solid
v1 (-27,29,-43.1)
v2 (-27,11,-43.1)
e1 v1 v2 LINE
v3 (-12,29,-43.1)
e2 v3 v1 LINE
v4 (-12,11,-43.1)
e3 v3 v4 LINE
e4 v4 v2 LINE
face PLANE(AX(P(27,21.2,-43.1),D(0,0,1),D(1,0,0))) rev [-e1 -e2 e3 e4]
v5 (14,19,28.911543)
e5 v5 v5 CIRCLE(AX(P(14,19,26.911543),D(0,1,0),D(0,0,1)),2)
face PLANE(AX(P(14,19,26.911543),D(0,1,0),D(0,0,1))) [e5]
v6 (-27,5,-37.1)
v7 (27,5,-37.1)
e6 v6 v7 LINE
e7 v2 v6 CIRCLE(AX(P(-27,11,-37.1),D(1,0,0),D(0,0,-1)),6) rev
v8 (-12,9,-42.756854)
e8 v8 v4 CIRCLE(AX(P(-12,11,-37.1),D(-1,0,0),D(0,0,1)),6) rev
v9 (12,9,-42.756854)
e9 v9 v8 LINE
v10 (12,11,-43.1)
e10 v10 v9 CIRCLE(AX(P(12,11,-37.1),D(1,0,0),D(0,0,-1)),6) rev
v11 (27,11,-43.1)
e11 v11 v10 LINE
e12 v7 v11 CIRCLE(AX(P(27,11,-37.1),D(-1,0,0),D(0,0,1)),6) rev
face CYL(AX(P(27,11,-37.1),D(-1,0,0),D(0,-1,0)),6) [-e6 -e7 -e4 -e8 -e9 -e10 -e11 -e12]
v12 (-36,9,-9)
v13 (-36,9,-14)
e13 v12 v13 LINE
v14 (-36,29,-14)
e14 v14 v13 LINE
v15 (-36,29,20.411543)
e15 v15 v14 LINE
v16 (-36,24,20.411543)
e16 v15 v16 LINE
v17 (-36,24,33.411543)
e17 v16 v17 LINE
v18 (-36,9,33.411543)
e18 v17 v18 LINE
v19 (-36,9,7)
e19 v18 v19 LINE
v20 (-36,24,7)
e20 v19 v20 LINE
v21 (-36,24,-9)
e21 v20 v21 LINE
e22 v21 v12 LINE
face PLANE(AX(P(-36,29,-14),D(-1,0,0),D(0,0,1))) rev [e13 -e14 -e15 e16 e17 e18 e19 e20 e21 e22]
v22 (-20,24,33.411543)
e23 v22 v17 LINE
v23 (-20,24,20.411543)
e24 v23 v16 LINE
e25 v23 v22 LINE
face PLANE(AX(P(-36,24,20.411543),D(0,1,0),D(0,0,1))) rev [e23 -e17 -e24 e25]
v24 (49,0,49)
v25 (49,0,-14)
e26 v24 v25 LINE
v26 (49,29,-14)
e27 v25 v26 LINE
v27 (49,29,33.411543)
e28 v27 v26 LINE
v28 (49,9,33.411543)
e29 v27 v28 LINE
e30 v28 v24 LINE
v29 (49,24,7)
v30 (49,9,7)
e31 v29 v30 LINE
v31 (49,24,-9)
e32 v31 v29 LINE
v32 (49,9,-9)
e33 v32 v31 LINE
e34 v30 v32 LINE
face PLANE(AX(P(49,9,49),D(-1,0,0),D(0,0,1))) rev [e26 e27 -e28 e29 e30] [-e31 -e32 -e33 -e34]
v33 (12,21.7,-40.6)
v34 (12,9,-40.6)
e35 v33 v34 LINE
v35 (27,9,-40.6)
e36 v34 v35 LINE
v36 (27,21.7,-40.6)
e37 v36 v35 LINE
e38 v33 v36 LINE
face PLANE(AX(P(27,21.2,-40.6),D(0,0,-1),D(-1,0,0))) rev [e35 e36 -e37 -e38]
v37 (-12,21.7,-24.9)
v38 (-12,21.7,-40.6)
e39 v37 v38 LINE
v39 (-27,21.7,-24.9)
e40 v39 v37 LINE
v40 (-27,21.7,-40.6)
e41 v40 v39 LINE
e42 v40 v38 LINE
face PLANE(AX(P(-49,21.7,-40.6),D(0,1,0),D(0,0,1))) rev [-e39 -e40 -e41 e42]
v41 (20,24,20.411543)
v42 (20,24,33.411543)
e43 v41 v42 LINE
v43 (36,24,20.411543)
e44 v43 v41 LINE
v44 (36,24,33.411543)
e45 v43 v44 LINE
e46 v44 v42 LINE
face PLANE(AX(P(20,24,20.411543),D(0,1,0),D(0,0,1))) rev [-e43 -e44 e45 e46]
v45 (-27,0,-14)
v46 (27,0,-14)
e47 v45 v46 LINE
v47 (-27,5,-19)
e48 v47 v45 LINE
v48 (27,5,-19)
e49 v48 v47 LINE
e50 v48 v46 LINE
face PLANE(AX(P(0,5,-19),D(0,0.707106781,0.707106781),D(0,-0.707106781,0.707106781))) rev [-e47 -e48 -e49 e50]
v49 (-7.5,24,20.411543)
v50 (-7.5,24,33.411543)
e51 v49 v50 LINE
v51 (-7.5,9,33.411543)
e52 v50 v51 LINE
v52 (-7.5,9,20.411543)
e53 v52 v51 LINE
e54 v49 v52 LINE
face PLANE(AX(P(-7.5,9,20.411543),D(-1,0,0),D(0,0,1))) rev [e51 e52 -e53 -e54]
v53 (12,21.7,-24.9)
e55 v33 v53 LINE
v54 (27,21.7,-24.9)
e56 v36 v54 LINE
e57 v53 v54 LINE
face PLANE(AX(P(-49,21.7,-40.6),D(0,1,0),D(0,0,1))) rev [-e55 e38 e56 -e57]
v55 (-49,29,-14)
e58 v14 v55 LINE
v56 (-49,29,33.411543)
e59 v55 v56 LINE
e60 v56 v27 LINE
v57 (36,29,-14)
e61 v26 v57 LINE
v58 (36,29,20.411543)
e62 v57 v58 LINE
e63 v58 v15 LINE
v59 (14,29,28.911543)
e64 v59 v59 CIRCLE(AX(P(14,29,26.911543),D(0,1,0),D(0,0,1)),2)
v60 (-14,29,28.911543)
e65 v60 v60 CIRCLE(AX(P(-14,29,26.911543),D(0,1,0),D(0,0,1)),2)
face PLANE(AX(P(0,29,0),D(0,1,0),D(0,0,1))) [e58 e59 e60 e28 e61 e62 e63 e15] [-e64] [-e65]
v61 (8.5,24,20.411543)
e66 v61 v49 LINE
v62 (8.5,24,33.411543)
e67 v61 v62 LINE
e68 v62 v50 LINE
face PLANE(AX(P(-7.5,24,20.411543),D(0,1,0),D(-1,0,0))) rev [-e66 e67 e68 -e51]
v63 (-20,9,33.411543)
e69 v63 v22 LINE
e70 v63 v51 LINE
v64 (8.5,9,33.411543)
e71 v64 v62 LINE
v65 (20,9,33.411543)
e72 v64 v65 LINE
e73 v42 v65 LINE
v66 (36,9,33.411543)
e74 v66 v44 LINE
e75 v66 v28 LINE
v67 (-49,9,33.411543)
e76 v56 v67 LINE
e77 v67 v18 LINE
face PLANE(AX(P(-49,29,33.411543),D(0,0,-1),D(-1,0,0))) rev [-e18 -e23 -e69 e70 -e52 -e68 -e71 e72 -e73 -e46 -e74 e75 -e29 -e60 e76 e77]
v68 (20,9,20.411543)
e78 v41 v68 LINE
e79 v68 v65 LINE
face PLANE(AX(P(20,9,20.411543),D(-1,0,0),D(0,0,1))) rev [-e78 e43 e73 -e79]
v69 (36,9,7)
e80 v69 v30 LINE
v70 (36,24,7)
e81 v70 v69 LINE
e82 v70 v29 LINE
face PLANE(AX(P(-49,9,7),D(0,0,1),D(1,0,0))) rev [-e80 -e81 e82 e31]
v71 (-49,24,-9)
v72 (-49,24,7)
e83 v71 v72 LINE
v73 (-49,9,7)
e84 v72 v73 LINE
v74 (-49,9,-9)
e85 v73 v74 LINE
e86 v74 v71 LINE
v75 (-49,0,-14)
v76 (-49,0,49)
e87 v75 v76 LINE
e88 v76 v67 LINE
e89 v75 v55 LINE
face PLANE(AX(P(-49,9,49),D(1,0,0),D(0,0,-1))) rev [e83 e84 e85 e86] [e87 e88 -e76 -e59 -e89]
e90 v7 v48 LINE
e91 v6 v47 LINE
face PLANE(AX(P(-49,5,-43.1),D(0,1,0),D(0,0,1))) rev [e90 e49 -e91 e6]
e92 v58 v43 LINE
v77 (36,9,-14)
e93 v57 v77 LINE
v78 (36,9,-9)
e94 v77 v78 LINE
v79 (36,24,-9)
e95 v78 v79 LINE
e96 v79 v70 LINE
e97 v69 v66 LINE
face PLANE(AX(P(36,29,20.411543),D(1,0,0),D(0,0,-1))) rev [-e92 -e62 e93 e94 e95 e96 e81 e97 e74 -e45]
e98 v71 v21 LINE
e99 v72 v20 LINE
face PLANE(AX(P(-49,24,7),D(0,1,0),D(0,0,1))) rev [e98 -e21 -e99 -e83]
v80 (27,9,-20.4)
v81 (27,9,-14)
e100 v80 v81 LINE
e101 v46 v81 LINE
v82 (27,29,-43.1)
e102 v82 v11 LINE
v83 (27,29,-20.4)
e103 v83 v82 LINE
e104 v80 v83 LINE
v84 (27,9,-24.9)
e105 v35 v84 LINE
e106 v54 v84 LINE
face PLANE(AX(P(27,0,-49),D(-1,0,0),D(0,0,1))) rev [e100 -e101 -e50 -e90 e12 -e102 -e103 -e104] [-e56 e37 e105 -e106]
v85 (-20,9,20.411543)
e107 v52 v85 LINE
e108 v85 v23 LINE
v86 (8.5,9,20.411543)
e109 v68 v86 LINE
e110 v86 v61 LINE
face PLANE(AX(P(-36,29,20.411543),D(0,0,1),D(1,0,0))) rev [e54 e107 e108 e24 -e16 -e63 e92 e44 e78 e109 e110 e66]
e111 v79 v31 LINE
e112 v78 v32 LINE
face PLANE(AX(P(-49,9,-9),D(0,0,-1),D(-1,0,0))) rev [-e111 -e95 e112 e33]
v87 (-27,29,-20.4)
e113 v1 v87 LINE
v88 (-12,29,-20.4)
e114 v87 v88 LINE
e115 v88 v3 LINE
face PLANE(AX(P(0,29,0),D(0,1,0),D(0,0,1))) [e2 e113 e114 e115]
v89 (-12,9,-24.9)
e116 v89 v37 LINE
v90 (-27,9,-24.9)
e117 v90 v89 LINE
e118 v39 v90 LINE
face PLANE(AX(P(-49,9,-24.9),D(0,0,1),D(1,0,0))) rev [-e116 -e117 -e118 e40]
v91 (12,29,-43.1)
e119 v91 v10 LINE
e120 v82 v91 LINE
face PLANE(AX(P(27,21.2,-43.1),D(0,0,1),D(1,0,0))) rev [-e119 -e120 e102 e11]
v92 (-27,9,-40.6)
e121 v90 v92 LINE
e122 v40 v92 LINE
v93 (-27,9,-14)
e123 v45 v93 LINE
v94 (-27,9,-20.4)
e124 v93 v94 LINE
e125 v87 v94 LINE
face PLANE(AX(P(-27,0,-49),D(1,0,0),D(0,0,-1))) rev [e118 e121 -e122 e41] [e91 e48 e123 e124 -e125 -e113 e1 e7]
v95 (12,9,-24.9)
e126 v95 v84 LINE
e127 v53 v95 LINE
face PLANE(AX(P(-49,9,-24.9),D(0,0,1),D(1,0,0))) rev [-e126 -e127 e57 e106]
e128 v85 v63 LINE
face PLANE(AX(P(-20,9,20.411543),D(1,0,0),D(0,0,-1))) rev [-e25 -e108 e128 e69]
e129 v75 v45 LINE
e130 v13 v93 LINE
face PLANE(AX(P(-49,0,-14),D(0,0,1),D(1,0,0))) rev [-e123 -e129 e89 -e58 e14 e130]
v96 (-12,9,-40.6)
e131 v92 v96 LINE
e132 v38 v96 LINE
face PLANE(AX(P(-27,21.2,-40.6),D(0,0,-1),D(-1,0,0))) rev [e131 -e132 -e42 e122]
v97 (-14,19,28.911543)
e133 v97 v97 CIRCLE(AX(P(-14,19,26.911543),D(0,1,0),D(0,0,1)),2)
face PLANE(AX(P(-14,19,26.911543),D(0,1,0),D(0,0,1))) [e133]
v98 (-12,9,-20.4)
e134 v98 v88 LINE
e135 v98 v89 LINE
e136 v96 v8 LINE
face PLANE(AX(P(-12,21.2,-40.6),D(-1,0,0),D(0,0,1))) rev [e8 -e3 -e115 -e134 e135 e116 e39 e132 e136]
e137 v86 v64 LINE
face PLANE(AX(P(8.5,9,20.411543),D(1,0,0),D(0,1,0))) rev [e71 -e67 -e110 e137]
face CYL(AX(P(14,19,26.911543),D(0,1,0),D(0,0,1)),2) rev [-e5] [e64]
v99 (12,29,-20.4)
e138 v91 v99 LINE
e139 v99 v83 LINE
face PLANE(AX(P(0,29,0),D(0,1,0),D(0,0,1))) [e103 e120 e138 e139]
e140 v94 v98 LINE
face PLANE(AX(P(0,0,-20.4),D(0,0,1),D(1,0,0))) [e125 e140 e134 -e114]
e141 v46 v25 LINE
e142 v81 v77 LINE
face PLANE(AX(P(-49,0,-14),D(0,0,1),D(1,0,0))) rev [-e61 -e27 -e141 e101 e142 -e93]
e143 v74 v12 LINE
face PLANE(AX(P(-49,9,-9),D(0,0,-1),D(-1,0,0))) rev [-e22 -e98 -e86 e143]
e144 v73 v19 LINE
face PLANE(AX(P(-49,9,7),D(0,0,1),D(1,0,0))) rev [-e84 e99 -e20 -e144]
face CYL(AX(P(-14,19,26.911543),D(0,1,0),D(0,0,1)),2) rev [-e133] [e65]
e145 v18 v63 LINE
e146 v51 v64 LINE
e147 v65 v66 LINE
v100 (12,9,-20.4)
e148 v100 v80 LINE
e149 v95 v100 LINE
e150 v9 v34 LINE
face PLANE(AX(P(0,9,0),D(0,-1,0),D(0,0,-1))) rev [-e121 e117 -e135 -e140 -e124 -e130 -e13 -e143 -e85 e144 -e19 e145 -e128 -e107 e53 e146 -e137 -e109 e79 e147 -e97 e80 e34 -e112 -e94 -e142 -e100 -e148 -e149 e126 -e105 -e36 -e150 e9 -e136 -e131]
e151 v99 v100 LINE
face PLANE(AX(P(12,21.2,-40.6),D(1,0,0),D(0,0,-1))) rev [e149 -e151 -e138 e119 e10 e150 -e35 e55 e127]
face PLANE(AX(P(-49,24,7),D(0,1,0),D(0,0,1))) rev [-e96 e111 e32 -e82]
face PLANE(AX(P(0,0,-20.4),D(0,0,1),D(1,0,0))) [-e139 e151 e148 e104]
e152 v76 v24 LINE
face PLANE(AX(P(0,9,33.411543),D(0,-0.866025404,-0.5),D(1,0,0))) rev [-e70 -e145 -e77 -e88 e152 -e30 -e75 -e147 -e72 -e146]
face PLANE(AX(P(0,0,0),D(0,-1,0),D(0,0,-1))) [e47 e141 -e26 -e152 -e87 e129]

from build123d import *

# Parameters (mm, degrees)
CROQUIS1_W              = 98
CROQUIS1_H              = 98
SALIENTE_EXTRUIR1_DEPTH = 9
CHAFL_N1_SIZE2          = 15.588457268
CHAFL_N1_SIZE           = 9
CROQUIS2_W              = 22
CROQUIS2_H              = 35
CORTAR_EXTRUIR1_DEPTH   = 9
CROQUIS3_W              = 15
CROQUIS3_H              = 2.5
SALIENTE_EXTRUIR2_DEPTH = 12.2
CROQUIS4_W              = 15
CROQUIS4_H              = 20.2
SALIENTE_EXTRUIR3_DEPTH = 2.5
CROQUIS5_W              = 5.9
CROQUIS5_H              = 9
CORTAR_EXTRUIR2_DEPTH   = 54.2
CROQUIS6_W              = 15
CROQUIS6_H              = 14.7
SALIENTE_EXTRUIR4_DEPTH = 2.5
SALIENTE_EXTRUIR5_DEPTH = 20
CROQUIS8_W              = 16
CROQUIS8_H              = 15
CORTAR_EXTRUIR3_DEPTH   = 98
CROQUIS9_W              = 16
CROQUIS9_H              = 15
CORTAR_EXTRUIR4_DEPTH   = 13
CROQUIS10_W             = 15
CROQUIS10_H             = 22.7
SALIENTE_EXTRUIR6_DEPTH = 5.3
CROQUIS11_R             = 2
CORTAR_EXTRUIR5_DEPTH   = 10
CROQUIS12_W             = 29.1
CROQUIS12_H             = 5
CORTAR_EXTRUIR6_DEPTH   = 95.963150748
NERVIO1_REACH           = 77.12
CROQUIS13_WALL_W        = 159.310876118
CROQUIS13_WALL_H        = 54
REDONDEO1_R             = 6
CROQUIS14_W             = 15.7
CROQUIS14_H             = 12.7
CORTAR_EXTRUIR7_DEPTH   = 95.963150748


# Some blends are built 0.0001 mm under size
with BuildPart() as part:
    # Croquis1 → Saliente-Extruir1 (new body)
    with BuildSketch(Plane(origin=(0, 0, 0), x_dir=(1, 0, 0), z_dir=(0, 1, 0))):
        Rectangle(CROQUIS1_W, CROQUIS1_H)
    extrude(amount=SALIENTE_EXTRUIR1_DEPTH)

    # Chaflán1
    chafl_n1_edges = [part.edges().sort_by_distance(p)[0] for p in [
        (0, 9, 49),
    ]]
    chafl_n1_side = [part.faces().sort_by_distance(p)[0] for p in [
        (0, 8.82, 49),
    ]]
    chamfer(chafl_n1_edges, length=CHAFL_N1_SIZE - 0.0001, length2=CHAFL_N1_SIZE2 - 0.0001, reference=chafl_n1_side[0])  # a hair under: the kernel refuses the full size

    # Croquis2 → Cortar-Extruir1 (cut)
    with BuildSketch(Plane(origin=(0, 9, 0), x_dir=(1, 0, 0), z_dir=(0, 1, 0))):
        with Locations((-38, 31.5)):
            Rectangle(CROQUIS2_W, CROQUIS2_H)
        with Locations((38, 31.5)):
            Rectangle(CROQUIS2_W, CROQUIS2_H)
    extrude(amount=-CORTAR_EXTRUIR1_DEPTH, mode=Mode.SUBTRACT)

    # Croquis3 → Saliente-Extruir2 (add)
    with BuildSketch(Plane(origin=(0, 9, 0), x_dir=(1, 0, 0), z_dir=(0, 1, 0))):
        with Locations((19.5, 41.85)):
            Rectangle(CROQUIS3_W, CROQUIS3_H)
        with Locations((19.5, 24.15)):
            Rectangle(CROQUIS3_W, CROQUIS3_H)
        with Locations((-19.5, 41.85)):
            Rectangle(CROQUIS3_W, CROQUIS3_H)
        with Locations((-19.5, 24.15)):
            Rectangle(CROQUIS3_W, CROQUIS3_H)
    extrude(amount=SALIENTE_EXTRUIR2_DEPTH)

    # Croquis4 → Saliente-Extruir3 (add)
    with BuildSketch(Plane(origin=(0, 21.2, 0), x_dir=(1, 0, 0), z_dir=(0, 1, 0))):
        with Locations((-19.5, 33)):
            Rectangle(CROQUIS4_W, CROQUIS4_H)
        with Locations((19.5, 33)):
            Rectangle(CROQUIS4_W, CROQUIS4_H)
    extrude(amount=SALIENTE_EXTRUIR3_DEPTH)

    # Croquis5 → Cortar-Extruir2 (cut)
    with BuildSketch(Plane(origin=(27, 0, 0), x_dir=(0, 0, -1), z_dir=(1, 0, 0))):
        with Locations((46.05, 4.5)):
            Rectangle(CROQUIS5_W, CROQUIS5_H)
    extrude(amount=-CORTAR_EXTRUIR2_DEPTH, mode=Mode.SUBTRACT)

    # Croquis6 → Saliente-Extruir4 (add)
    with BuildSketch(Plane.XY.offset(-22.9)):
        with Locations((-19.5, 16.35)):
            Rectangle(CROQUIS6_W, CROQUIS6_H)
        with Locations((19.5, 16.35)):
            Rectangle(CROQUIS6_W, CROQUIS6_H)
    extrude(amount=SALIENTE_EXTRUIR4_DEPTH)

    # Croquis7 → Saliente-Extruir5 (add)
    with BuildSketch(Plane(origin=(0, 9, 0), x_dir=(1, 0, 0), z_dir=(0, 1, 0))):
        Polygon((-49, 14), (-49, -33.411542732), (49, -33.411542732), (49, 14), (36, 14), (36, -20.411542732), (-36, -20.411542732), (-36, 14), align=None)
    extrude(amount=SALIENTE_EXTRUIR5_DEPTH)

    # Croquis8 → Cortar-Extruir3 (cut)
    with BuildSketch(Plane(origin=(49, 0, 0), x_dir=(0, 0, -1), z_dir=(1, 0, 0))):
        with Locations((1, 16.5)):
            Rectangle(CROQUIS8_W, CROQUIS8_H)
    extrude(amount=-CORTAR_EXTRUIR3_DEPTH, mode=Mode.SUBTRACT)

    # Croquis9 → Cortar-Extruir4 (cut)
    with BuildSketch(Plane.XY.offset(33.411542732)):
        with Locations((-28, 16.5)):
            Rectangle(CROQUIS9_W, CROQUIS9_H)
        with Locations((0.5, 16.5)):
            Rectangle(CROQUIS9_W, CROQUIS9_H)
        with Locations((28, 16.5)):
            Rectangle(CROQUIS9_W, CROQUIS9_H)
    extrude(amount=-CORTAR_EXTRUIR4_DEPTH, mode=Mode.SUBTRACT)

    # Croquis10 → Saliente-Extruir6 (add)
    with BuildSketch(Plane(origin=(0, 23.7, 0), x_dir=(1, 0, 0), z_dir=(0, 1, 0))):
        with Locations((-19.5, 31.75)):
            Rectangle(CROQUIS10_W, CROQUIS10_H)
        with Locations((19.5, 31.75)):
            Rectangle(CROQUIS10_W, CROQUIS10_H)
    extrude(amount=SALIENTE_EXTRUIR6_DEPTH)

    # Croquis11 → Cortar-Extruir5 (cut)
    with BuildSketch(Plane(origin=(0, 29, 0), x_dir=(1, 0, 0), z_dir=(0, 1, 0))):
        with Locations(Location((-14, -26.911542732, 0), (0, 0, 270))):
            Circle(CROQUIS11_R)
        with Locations(Location((14, -26.911542732, 0), (0, 0, 270))):
            Circle(CROQUIS11_R)
    extrude(amount=-CORTAR_EXTRUIR5_DEPTH, mode=Mode.SUBTRACT)

    # Croquis12 → Cortar-Extruir6 (cut, through all)
    with BuildSketch(Plane(origin=(27, 0, 0), x_dir=(0, 0, -1), z_dir=(1, 0, 0))):
        with Locations((28.55, 2.5)):
            Rectangle(CROQUIS12_W, CROQUIS12_H)
    extrude(amount=-CORTAR_EXTRUIR6_DEPTH, mode=Mode.SUBTRACT)

    # Croquis13 wall → Nervio1 (add, up to next)
    with BuildSketch(Plane(origin=(0, 2.5, -16.5), x_dir=(0, -0.707106781187, 0.707106781187), z_dir=(0, -0.707106781187, -0.707106781187)), mode=Mode.PRIVATE) as nervio1_sk1:
        Rectangle(CROQUIS13_WALL_W, CROQUIS13_WALL_H)
    nervio1_tool1 = extrude(nervio1_sk1.sketch, amount=-NERVIO1_REACH, mode=Mode.PRIVATE) - part.part
    add(nervio1_tool1.solids().sort_by_distance((0, 2.5, -16.5))[0])

    # Redondeo1
    # the kernel refuses this fillet: 6 mm, written as the material it takes off along each edge
    with BuildSketch(Plane(origin=(42, 5, -43.1), x_dir=(0, 0, 1), z_dir=(-1, 0, 0))) as redondeo1_piece_1:
        with BuildLine():
            CenterArc((REDONDEO1_R, REDONDEO1_R), REDONDEO1_R, 180, 90)
            Line((0, REDONDEO1_R), (0, 0))
            Line((0, 0), (REDONDEO1_R, 0))
        make_face()
    extrude(amount=84, mode=Mode.SUBTRACT)

    # Croquis14 → Cortar-Extruir7 (cut, through all)
    with BuildSketch(Plane(origin=(27, 0, 0), x_dir=(0, 0, -1), z_dir=(1, 0, 0))):
        with Locations((32.75, 15.35)):
            Rectangle(CROQUIS14_W, CROQUIS14_H)
    extrude(amount=-CORTAR_EXTRUIR7_DEPTH, mode=Mode.SUBTRACT)


solid = part.part
